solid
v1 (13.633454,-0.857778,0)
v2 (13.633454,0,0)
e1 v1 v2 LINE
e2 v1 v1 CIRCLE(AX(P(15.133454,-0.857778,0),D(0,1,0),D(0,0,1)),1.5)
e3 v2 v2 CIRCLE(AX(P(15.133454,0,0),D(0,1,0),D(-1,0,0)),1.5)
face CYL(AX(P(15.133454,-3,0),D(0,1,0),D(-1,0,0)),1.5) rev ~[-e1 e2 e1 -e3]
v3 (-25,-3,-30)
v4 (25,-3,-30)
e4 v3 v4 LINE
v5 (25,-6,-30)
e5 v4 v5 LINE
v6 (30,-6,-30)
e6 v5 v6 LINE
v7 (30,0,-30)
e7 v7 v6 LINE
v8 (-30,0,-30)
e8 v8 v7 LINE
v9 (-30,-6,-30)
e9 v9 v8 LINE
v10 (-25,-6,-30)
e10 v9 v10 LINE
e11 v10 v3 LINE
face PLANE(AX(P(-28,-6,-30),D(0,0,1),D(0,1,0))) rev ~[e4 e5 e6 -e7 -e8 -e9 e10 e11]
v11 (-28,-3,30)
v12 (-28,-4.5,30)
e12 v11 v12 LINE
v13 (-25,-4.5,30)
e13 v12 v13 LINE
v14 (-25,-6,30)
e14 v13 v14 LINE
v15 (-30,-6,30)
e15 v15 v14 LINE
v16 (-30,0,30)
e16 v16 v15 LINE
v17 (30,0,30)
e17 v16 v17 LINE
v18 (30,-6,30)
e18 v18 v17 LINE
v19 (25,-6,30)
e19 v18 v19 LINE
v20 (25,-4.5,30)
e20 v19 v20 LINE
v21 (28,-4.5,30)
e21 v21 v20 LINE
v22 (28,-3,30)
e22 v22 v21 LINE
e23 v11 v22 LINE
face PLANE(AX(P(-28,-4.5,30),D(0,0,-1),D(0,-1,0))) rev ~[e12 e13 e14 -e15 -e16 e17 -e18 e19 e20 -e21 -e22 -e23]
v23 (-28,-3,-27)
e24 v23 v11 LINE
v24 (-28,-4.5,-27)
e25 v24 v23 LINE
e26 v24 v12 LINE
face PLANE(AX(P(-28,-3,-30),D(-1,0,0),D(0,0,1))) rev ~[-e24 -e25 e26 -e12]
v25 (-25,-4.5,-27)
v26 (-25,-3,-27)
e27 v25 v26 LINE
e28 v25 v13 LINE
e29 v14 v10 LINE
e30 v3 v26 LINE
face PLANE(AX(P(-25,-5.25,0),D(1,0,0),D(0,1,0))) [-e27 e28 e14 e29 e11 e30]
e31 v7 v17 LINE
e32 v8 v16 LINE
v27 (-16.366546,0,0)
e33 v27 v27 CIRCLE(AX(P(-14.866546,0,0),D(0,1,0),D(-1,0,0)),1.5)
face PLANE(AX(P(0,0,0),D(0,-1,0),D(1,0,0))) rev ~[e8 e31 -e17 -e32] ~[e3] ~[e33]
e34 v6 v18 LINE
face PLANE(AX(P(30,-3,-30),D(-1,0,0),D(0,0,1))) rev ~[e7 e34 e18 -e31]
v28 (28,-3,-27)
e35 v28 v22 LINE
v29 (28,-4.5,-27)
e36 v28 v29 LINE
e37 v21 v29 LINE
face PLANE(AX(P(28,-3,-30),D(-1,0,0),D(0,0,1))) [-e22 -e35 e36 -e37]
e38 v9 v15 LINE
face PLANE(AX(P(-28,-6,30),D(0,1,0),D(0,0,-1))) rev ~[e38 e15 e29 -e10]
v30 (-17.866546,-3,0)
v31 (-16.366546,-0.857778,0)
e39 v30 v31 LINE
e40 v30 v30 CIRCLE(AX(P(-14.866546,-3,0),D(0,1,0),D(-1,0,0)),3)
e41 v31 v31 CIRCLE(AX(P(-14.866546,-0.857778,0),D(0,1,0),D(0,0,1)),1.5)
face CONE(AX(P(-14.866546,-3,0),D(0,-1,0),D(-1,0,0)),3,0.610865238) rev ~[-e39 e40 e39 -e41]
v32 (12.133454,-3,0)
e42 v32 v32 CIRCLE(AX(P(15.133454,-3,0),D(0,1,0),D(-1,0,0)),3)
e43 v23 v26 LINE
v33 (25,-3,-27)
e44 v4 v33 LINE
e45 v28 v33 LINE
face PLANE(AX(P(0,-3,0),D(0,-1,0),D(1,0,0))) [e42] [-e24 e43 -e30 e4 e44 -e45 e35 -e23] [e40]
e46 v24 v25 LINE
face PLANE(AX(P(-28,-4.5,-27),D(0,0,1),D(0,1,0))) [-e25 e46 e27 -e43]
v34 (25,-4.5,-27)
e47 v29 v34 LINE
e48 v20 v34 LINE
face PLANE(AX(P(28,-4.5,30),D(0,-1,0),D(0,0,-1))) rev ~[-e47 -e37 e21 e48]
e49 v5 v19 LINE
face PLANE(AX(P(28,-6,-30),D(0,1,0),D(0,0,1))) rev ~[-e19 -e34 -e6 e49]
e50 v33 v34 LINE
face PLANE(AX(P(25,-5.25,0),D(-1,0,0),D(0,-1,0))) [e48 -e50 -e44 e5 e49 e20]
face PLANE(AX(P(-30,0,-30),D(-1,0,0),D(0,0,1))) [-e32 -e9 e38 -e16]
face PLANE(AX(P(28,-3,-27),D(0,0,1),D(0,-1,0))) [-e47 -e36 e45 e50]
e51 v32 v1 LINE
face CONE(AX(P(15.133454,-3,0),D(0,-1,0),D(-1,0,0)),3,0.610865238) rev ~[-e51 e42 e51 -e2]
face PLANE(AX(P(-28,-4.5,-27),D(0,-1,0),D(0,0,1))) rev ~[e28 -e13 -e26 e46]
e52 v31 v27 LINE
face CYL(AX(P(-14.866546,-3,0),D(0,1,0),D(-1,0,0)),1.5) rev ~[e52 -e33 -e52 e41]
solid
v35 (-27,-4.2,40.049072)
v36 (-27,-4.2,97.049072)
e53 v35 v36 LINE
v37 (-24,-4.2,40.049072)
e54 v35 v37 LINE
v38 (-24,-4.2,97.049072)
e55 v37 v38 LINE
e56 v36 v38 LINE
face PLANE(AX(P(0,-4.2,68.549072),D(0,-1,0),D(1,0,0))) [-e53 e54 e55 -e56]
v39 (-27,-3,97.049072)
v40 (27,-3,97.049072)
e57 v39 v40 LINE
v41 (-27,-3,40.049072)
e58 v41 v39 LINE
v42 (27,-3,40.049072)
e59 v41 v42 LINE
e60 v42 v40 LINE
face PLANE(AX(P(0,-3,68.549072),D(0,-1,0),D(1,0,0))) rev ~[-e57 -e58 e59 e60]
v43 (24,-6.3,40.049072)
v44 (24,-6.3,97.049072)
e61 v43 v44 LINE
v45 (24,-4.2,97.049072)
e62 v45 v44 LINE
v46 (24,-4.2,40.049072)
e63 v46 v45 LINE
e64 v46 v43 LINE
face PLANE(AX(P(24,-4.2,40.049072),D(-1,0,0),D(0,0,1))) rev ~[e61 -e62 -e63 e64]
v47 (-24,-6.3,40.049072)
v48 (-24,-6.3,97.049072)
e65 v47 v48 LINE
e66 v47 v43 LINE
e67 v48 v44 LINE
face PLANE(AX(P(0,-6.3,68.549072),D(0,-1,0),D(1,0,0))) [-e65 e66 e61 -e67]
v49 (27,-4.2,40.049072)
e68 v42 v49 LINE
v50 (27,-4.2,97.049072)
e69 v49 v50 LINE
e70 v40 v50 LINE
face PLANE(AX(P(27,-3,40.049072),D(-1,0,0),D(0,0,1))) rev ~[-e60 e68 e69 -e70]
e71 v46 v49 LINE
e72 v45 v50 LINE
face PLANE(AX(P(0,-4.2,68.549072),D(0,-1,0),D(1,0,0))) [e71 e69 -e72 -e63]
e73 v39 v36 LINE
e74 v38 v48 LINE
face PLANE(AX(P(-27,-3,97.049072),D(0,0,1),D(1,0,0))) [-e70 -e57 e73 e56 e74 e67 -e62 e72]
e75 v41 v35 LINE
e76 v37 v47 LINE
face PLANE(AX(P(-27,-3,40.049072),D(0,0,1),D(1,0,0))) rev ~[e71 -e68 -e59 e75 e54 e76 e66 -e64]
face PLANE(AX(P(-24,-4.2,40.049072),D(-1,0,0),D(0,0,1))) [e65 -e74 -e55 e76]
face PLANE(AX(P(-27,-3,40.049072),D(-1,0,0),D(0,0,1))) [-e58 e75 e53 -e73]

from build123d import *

# Parameters (mm, degrees)
F0_W           = 60
F0_H           = 60
F1_DEPTH       = 3
F2_W           = 2
F2_H           = 60
F3_DEPTH       = 3
F5_D           = 3
F5_CSINK_D     = 6
F5_CSINK_ANGLE = 70
F6_W           = 1.5
F6_H           = 3
F7_DEPTH       = 3
F8_W           = 1.5
F8_H           = 3
F9_DEPTH       = 3
F10_W          = 54
F10_H          = 57
F11_DEPTH      = 1.2
F12_W          = 48
F12_H          = 57
F13_DEPTH      = 2.1


# Not quite as in the source:
# - a feature names something its author has since deleted; it is built from what else it names


with BuildPart() as f1:
    # F0 (on Front) → F1 (new body)
    with BuildSketch(Plane.XZ):
        Rectangle(F0_W, F0_H)
    extrude(amount=F1_DEPTH)

    # F2 (on face) → F3 (join)
    with BuildSketch(Plane.XZ.offset(3)):
        with Locations((29, 0)):
            Rectangle(F2_W, F2_H)
        with Locations((-29, 0)):
            Rectangle(F2_W, F2_H)
    extrude(amount=F3_DEPTH)

    # F5 (through all)
    with Locations(Plane.XZ.offset(3)):
        with Locations((15.1334543969, 0), (-14.8665456031, 0)):
            CounterSinkHole(F5_D / 2, F5_CSINK_D / 2, counter_sink_angle=F5_CSINK_ANGLE)

    # F6 (on face) → F7 (join)
    with BuildSketch(Plane(origin=(28, 0, 0), x_dir=(0, -1, 0), z_dir=(-1, 0, 0))):
        Polygon((6, -30), (6, 30), (4.5, 30), (4.5, -27), (4.5, -30), align=None)
        with Locations((3.75, -28.5)):
            Rectangle(F6_W, F6_H)
    extrude(amount=F7_DEPTH)

    # F8 (on face) → F9 (join)
    with BuildSketch(Plane.YZ.offset(-28)):
        Polygon((-4.5, 30), (-6, 30), (-6, -30), (-4.5, -30), (-4.5, -27), align=None)
        with Locations((-3.75, -28.5)):
            Rectangle(F8_W, F8_H)
    extrude(amount=F9_DEPTH)


with BuildPart() as f11:
    # F10 (on face) → F11 (new body)
    with BuildSketch(Plane.XZ.offset(3)):
        with Locations((0, 68.5490723848)):
            Rectangle(F10_W, F10_H)
    extrude(amount=F11_DEPTH)

    # F12 (on face) → F13 (join)
    with BuildSketch(Plane.XZ.offset(4.2)):
        with Locations((0, 68.5490723848)):
            Rectangle(F12_W, F12_H)
    extrude(amount=F13_DEPTH)


solid = Compound([f1.part, f11.part])
